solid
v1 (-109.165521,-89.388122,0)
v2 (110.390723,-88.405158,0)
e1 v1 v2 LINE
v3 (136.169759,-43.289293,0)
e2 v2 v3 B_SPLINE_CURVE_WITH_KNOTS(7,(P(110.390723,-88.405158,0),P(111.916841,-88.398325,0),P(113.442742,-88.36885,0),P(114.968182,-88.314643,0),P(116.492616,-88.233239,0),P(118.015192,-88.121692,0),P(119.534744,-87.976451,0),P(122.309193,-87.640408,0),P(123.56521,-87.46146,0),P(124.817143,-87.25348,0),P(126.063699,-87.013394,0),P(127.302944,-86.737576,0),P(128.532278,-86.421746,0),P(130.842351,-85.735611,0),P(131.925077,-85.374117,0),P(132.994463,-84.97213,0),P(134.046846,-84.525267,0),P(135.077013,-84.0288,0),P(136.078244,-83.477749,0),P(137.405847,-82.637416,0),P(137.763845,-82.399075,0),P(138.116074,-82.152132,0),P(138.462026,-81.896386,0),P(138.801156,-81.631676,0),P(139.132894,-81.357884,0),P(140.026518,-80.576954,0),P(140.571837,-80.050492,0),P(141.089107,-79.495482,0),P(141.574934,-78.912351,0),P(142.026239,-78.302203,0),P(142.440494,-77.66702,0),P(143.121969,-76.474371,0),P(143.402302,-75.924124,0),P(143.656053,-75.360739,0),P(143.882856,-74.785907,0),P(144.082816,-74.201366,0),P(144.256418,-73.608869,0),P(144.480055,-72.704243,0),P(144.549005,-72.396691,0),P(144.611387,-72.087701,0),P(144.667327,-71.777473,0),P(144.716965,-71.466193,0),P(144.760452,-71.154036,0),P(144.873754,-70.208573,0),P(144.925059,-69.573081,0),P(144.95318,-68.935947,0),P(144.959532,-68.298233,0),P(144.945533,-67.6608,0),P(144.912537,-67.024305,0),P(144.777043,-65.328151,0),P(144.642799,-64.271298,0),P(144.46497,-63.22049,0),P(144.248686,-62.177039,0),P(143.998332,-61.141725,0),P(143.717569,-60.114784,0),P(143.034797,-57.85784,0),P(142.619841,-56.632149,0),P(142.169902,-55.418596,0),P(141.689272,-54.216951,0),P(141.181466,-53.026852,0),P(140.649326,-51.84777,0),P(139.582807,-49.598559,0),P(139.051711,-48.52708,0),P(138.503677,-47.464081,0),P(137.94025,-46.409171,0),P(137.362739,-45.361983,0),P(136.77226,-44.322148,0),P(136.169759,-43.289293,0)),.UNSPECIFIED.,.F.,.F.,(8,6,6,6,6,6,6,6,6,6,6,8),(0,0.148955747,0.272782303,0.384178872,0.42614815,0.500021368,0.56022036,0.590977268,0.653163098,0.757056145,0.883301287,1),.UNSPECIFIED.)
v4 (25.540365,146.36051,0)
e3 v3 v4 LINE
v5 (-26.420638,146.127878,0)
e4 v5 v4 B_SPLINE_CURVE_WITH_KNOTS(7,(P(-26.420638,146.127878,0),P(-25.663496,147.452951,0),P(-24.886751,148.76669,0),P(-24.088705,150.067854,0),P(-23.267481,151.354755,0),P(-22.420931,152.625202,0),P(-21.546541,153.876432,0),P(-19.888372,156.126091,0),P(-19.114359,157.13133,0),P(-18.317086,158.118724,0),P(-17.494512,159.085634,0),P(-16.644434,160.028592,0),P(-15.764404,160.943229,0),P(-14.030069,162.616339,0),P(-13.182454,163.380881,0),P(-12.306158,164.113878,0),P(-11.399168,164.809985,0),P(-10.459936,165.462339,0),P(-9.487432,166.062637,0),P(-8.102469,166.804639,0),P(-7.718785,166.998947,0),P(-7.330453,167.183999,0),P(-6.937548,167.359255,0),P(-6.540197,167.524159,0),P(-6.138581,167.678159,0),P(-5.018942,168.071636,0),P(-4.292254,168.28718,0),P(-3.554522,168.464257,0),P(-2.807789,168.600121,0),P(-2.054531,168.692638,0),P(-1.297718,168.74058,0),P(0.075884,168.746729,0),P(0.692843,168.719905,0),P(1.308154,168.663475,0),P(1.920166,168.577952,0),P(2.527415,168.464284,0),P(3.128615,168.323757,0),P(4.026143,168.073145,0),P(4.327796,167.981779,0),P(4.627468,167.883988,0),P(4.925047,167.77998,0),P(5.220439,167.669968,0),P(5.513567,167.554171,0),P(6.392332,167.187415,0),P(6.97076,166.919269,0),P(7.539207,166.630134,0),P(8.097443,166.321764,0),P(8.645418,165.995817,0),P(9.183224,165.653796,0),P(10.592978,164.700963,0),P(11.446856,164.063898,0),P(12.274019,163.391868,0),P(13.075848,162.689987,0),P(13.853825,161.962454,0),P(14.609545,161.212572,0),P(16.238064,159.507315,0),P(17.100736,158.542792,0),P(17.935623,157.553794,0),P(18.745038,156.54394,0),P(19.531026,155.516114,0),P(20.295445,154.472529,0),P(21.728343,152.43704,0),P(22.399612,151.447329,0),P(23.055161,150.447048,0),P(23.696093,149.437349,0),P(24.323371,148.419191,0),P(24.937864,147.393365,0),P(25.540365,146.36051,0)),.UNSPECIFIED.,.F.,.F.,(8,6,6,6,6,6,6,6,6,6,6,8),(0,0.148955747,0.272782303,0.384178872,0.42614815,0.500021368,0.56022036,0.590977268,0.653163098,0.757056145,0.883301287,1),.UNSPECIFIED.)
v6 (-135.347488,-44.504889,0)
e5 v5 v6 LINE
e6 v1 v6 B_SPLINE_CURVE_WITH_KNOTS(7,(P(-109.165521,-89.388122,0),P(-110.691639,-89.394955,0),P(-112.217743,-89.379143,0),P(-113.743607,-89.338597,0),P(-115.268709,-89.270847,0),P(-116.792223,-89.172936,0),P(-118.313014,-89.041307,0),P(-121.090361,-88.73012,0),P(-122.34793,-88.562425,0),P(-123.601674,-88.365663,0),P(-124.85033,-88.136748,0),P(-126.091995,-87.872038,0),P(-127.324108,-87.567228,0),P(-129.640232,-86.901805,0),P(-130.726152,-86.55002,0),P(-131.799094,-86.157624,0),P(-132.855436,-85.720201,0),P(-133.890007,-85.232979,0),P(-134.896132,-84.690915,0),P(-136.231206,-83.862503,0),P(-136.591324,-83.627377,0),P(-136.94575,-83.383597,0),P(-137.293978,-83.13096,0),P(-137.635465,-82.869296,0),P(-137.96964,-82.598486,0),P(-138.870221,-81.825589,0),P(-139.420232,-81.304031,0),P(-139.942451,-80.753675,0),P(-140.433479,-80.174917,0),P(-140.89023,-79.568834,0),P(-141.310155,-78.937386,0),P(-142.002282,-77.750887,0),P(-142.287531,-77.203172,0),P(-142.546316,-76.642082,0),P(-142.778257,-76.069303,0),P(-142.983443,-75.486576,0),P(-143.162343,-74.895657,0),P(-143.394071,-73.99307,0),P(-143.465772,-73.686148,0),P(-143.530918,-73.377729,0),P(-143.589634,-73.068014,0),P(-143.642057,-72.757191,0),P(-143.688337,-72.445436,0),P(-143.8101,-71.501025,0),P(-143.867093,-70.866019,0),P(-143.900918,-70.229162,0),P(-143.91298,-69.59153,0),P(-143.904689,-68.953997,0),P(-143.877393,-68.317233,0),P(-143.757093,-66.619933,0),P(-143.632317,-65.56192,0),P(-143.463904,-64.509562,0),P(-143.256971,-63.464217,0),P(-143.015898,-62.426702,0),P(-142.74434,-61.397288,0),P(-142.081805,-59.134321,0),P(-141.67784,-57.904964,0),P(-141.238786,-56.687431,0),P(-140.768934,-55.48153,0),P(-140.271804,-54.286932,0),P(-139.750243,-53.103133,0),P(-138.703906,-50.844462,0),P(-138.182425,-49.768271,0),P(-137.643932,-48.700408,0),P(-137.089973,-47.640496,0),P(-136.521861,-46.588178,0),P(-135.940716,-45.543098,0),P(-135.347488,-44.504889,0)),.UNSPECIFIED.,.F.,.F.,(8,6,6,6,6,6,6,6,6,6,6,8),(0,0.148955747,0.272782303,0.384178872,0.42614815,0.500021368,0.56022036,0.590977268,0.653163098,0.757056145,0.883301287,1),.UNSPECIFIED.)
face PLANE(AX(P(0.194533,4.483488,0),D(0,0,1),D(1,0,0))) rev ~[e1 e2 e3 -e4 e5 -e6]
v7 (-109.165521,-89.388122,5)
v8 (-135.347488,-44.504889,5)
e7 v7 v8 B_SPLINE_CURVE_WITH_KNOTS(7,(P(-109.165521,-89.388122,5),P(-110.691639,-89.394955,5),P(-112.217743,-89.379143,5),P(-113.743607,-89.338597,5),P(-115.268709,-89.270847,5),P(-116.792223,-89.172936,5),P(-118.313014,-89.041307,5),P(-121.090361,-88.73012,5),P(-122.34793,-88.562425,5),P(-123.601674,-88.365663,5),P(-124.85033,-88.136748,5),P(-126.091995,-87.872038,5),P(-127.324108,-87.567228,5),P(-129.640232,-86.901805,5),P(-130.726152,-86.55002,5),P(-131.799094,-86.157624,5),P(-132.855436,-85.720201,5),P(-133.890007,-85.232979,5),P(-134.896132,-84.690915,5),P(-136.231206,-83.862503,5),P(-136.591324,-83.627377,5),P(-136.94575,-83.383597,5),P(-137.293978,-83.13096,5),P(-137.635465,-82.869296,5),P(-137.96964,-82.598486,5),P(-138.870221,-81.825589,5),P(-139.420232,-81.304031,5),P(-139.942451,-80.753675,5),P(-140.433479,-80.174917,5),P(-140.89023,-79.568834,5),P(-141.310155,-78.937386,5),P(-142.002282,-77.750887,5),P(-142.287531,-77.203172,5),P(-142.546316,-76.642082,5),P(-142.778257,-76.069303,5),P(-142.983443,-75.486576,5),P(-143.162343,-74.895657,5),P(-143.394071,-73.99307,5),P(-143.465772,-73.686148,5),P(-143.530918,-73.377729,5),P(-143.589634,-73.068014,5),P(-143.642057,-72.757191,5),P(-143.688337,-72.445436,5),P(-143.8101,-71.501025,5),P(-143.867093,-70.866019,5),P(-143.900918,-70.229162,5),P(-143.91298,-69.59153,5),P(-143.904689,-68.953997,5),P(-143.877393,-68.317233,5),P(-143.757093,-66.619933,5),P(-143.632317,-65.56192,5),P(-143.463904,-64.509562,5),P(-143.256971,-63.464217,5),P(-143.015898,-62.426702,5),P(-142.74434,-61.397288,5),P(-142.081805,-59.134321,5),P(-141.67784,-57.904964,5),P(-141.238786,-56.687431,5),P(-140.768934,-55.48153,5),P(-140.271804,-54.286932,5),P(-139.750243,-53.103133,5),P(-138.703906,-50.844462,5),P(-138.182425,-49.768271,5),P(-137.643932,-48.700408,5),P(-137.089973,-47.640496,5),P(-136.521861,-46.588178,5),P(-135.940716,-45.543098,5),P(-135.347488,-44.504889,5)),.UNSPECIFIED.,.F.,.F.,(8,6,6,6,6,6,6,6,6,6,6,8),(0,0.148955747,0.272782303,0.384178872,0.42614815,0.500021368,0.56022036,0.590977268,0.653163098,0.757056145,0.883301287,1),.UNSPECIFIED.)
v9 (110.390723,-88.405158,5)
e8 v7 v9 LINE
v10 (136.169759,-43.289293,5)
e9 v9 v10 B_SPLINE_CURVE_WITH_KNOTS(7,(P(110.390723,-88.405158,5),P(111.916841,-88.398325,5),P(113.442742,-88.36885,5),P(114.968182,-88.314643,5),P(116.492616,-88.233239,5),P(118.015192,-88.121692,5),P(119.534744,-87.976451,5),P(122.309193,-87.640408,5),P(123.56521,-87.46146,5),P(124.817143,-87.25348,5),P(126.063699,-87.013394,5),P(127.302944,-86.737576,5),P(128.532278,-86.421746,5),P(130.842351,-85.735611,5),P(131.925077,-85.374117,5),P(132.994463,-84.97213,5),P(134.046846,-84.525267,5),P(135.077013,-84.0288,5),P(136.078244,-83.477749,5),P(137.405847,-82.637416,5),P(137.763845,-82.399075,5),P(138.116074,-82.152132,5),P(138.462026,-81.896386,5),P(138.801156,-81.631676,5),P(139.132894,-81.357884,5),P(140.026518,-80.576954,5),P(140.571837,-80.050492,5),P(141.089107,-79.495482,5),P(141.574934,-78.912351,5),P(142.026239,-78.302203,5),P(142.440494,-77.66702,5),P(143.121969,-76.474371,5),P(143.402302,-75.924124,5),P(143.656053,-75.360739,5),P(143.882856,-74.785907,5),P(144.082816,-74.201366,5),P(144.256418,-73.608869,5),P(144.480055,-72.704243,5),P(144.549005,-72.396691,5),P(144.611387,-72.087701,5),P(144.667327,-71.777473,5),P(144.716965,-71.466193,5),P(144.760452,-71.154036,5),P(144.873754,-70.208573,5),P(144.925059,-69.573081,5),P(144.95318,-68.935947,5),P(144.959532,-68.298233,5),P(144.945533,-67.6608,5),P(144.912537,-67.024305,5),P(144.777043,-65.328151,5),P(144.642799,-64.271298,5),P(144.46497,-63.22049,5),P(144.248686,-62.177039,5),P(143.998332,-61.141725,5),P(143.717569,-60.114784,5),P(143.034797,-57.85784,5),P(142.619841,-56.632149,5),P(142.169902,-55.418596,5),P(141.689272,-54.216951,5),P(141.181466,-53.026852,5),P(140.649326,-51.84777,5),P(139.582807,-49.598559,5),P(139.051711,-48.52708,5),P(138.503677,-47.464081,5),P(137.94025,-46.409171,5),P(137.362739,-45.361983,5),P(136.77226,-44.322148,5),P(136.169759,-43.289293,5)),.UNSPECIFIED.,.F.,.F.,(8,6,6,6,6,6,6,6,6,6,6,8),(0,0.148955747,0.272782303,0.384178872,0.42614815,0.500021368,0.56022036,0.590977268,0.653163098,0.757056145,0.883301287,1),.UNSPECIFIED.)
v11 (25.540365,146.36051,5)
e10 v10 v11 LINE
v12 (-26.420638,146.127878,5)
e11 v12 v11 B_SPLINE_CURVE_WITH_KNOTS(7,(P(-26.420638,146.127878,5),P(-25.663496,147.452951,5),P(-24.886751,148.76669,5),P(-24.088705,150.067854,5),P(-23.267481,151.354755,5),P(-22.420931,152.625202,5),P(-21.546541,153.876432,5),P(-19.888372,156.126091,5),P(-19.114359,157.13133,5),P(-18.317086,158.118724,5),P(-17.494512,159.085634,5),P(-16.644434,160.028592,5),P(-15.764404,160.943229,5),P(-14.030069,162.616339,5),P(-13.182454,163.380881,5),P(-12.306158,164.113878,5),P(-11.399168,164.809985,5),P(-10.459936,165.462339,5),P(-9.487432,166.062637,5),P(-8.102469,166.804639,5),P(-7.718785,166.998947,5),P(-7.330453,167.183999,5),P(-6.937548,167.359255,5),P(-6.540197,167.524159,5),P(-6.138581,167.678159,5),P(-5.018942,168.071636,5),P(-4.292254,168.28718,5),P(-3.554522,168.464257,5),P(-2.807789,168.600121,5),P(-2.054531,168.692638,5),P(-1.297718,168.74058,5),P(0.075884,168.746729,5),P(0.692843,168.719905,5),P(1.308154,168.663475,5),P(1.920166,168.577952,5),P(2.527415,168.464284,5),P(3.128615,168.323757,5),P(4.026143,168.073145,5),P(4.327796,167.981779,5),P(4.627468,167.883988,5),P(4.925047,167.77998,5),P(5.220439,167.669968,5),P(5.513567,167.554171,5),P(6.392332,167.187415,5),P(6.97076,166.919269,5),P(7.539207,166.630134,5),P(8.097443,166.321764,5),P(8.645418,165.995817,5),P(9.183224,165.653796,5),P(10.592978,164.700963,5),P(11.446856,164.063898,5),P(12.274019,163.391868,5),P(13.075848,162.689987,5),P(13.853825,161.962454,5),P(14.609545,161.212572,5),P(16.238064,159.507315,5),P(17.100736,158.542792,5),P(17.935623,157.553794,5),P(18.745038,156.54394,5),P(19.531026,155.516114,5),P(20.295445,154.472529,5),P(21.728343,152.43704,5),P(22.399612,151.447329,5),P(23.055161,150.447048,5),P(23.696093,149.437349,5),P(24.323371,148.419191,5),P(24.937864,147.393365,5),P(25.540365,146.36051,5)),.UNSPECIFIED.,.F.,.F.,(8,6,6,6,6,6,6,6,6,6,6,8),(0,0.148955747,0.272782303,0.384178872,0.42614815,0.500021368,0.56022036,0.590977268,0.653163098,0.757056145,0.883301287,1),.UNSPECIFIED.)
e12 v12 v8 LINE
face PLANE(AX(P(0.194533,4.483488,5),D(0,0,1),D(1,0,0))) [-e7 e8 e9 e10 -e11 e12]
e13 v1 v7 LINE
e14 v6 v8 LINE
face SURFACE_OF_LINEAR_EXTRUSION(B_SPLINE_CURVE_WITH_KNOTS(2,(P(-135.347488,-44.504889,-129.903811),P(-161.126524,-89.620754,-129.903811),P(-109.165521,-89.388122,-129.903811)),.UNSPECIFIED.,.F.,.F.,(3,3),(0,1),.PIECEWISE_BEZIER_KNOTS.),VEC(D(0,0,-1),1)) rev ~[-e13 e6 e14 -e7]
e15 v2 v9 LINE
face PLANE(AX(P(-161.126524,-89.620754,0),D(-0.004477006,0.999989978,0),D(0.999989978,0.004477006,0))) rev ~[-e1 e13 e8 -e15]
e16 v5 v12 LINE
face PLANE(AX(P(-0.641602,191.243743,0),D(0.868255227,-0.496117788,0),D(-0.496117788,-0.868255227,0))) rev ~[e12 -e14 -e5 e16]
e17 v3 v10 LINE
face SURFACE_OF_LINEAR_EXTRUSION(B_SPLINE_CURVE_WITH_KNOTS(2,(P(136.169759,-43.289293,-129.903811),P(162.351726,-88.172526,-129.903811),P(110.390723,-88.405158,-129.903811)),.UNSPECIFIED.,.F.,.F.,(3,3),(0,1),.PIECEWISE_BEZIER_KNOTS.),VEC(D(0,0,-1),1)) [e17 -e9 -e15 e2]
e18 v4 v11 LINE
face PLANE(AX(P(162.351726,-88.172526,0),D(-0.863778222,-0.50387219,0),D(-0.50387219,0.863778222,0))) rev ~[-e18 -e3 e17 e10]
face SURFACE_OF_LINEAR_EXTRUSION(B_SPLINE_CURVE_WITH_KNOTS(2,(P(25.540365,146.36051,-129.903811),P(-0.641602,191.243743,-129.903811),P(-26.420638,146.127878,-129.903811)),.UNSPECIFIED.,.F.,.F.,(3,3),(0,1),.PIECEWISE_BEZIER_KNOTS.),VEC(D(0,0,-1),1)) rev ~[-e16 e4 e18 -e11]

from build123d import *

# Parameters (mm, degrees)
F1_DEPTH    = 5
F2_T1_DEPTH = 264.8076211353


# Not quite as in the source:
# - a fillet or chamfer that OpenCascade refuses, or shapes differently, is made with other operations: its cross-section is extruded or revolved along the edge and cut away or added


with BuildPart() as f1:
    # F0 (on Top) → F1 (new body)
    with BuildSketch(Plane.XY):
        Polygon((-0.6416016338, 191.2437425446), (-161.12652421, -89.6207541227), (162.3517262131, -88.1725256644), align=None)
    extrude(amount=F1_DEPTH)

    # F2: fillet of radius 30 on 3 edges, made by hand

    # F2_s2 → F2_t1 (cut)
    with BuildSketch(Plane.XY.offset(-129.9038105677)):
        with BuildLine():
            add(Edge.make_bspline(
                [(25.5403653575, 146.3605095453), (-0.6416016338, 191.2437425446), (-26.4206381195, 146.1278775095)],
                knots=[0, 0, 0, 1, 1, 1], degree=2, weights=[1, 1, 1]))
            Line((-26.4206381195, 146.1278775095), (-0.6416016338, 191.2437425446))
            Line((-0.6416016338, 191.2437425446), (25.5403653575, 146.3605095453))
        make_face()
        with BuildLine():
            add(Edge.make_bspline(
                [(-135.3474877243, -44.5048890876), (-161.12652421, -89.6207541227), (-109.165520733, -89.3881220869)],
                knots=[0, 0, 0, 1, 1, 1], degree=2, weights=[1, 1, 1]))
            Line((-109.165520733, -89.3881220869), (-161.12652421, -89.6207541227))
            Line((-161.12652421, -89.6207541227), (-135.3474877243, -44.5048890876))
        make_face()
        with BuildLine():
            add(Edge.make_bspline(
                [(136.1697592218, -43.2892926651), (162.3517262131, -88.1725256644), (110.3907227362, -88.4051577003)],
                knots=[0, 0, 0, 1, 1, 1], degree=2, weights=[1, 1, 1]))
            Line((110.3907227362, -88.4051577003), (162.3517262131, -88.1725256644))
            Line((162.3517262131, -88.1725256644), (136.1697592218, -43.2892926651))
        make_face()
    extrude(amount=F2_T1_DEPTH, mode=Mode.SUBTRACT)


solid = f1.part
